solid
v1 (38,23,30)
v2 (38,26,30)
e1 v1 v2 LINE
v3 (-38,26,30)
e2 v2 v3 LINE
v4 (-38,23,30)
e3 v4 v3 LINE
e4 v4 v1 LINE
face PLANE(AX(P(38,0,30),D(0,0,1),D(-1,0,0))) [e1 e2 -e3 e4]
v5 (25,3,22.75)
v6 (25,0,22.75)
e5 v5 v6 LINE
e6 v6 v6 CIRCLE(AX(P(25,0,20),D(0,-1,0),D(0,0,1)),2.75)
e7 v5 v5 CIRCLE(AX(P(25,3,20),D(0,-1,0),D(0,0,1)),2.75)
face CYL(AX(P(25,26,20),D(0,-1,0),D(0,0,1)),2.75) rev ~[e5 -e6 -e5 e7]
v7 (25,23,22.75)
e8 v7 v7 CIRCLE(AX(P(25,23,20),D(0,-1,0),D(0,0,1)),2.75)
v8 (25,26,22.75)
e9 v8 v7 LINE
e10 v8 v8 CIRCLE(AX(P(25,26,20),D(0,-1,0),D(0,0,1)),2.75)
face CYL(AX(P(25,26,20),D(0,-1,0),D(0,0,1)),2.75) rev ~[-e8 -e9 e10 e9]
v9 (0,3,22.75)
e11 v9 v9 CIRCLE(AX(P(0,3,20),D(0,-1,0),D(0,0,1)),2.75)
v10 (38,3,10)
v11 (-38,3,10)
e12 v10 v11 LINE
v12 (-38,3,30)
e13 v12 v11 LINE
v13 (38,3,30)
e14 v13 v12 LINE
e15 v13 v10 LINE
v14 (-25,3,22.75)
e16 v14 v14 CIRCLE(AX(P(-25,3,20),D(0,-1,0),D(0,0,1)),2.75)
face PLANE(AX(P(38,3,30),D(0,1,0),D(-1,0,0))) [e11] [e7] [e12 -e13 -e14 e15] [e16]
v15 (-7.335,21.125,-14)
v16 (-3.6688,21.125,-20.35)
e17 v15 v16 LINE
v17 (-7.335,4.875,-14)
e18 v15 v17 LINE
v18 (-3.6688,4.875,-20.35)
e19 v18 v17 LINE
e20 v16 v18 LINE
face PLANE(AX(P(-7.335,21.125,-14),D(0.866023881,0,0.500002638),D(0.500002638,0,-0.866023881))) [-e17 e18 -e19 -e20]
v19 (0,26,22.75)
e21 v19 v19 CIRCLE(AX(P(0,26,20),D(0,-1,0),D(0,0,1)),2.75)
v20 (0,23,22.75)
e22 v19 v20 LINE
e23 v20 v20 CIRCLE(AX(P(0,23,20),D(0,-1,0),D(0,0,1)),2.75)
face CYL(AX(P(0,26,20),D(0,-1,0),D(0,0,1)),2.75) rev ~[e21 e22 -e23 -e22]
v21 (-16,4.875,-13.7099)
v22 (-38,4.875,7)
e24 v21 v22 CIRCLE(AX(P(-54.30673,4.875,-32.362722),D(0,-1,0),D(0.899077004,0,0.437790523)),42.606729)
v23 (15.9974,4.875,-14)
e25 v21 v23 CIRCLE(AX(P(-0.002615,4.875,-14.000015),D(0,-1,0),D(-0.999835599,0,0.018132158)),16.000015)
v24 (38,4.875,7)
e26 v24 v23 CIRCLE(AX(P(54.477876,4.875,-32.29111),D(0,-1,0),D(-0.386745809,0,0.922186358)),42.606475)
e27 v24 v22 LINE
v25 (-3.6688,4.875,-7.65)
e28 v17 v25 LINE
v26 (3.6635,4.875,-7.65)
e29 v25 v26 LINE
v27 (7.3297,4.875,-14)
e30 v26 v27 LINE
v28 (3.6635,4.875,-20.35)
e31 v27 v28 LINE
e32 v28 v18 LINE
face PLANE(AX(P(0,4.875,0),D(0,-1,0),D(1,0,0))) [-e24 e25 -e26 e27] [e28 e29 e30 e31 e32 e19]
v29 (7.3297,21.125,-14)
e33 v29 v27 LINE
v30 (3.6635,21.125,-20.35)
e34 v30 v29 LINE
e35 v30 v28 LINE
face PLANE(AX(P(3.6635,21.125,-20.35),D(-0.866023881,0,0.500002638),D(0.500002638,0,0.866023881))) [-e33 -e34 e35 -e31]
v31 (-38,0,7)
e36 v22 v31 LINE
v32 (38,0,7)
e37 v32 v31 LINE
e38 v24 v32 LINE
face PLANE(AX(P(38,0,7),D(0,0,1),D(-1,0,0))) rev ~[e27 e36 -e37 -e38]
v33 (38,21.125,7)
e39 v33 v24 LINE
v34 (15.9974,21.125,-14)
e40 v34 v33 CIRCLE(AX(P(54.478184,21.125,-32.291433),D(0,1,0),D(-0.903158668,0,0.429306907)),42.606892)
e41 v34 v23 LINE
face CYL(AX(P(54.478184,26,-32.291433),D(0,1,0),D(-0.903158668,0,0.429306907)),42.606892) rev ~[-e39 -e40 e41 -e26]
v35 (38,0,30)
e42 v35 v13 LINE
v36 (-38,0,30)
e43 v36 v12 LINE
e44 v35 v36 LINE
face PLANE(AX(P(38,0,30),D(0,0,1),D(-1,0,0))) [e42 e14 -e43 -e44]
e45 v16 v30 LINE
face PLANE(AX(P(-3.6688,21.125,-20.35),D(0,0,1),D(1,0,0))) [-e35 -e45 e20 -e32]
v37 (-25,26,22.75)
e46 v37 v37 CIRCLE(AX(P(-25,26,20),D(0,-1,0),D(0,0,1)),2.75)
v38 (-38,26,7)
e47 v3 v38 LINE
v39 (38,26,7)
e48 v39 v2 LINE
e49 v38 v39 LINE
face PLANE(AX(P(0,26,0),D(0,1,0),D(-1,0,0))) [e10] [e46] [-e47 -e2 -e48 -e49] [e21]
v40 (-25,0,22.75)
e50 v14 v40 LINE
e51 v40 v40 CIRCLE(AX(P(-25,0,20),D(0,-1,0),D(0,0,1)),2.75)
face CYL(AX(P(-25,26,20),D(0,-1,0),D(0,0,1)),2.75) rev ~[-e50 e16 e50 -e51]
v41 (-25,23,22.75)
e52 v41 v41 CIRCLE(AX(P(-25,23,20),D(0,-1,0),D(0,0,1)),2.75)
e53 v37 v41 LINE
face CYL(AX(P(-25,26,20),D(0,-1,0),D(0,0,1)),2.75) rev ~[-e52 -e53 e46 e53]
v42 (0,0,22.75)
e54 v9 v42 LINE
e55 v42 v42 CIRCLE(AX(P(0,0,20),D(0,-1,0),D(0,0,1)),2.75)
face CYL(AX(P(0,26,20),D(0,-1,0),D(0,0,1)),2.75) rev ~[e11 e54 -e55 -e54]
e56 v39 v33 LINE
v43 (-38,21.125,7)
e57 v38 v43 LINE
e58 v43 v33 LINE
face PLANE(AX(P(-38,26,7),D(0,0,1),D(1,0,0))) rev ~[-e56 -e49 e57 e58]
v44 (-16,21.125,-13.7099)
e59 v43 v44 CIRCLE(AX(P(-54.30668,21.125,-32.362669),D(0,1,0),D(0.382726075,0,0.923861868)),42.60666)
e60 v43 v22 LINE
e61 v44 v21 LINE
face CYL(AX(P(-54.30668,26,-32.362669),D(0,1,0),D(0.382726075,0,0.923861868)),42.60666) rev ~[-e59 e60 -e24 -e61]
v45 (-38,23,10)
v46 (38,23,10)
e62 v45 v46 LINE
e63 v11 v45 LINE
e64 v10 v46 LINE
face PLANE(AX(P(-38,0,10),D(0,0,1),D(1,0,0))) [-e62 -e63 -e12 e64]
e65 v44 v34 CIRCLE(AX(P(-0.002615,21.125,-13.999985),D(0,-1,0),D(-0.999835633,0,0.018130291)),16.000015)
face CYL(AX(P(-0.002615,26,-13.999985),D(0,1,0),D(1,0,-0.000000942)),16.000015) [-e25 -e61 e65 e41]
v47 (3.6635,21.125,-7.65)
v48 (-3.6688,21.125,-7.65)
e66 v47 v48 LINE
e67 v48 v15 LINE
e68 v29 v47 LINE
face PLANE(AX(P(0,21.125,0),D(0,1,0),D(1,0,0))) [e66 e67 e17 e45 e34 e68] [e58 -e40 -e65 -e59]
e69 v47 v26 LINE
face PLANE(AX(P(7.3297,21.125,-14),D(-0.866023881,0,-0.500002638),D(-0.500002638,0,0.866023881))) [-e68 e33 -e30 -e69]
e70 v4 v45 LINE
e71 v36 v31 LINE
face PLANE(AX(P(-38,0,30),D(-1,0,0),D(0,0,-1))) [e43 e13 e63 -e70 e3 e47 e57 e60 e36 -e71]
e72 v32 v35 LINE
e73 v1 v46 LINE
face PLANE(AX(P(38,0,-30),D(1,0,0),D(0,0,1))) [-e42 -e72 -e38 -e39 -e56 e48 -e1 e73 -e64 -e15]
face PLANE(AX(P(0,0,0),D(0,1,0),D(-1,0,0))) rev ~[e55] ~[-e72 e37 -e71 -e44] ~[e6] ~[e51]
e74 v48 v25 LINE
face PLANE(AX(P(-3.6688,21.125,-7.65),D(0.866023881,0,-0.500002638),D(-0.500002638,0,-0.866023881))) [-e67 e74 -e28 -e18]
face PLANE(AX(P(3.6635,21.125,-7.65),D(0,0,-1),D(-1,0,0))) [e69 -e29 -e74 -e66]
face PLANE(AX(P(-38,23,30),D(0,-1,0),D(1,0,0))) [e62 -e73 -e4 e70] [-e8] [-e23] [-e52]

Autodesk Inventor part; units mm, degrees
ref_plane "YZ Plane" through (0, 0, 0) normal (1, 0, 0) x (0, 1, 0)
ref_plane "XZ Plane" through (0, 0, 0) normal (0, 1, 0) x (-1, 0, 0)
ref_plane "XY Plane" through (0, 0, 0) normal (0, 0, 1) x (1, 0, 0)
sketch "Sketch1" plane through (0, 0, 0) normal (0, 1, 0) x (-1, 0, 0)
  line L0 (-38, 30) -> (38, 30)
  line L1 (38, 30) -> (38, -30)
  line L2 (38, -30) -> (-38, -30)
  line L3 (-38, -30) -> (-38, 30)
  line L4 (-38, 30) -> (38, -30) construction
  line L5 (38, 30) -> (-38, -30) construction
  point P0 (0, 0)
  dimension "d0" = 60
  dimension "d1" = 76
extrude "Extrusion1" add sketch "Sketch1" along normal blind 26
sketch "Sketch2" plane through (-38, 0, 30) normal (0, 0, 1) x (1, 0, 0)
  line L0 (0, 0) -> (0, 26) projected
  line L1 (76, 0) -> (76, 26) projected
  line L2 (0, 23) -> (76, 23)
  line L3 (76, 23) -> (76, 3)
  line L4 (76, 3) -> (0, 3)
  line L5 (0, 3) -> (0, 23)
  line L6 (0, 26) -> (76, 26) projected
  line L7 (0, 0) -> (76, 0) projected
  point P0 (38, 0)
  point P1 (0, 3)
  dimension "d4" = 3
  dimension "d5" = 3
extrude "Extrusion2" cut sketch "Sketch2" against normal blind 20 contours L0 L2 L1 L4
sketch "Sketch3" plane through (0, 26, 0) normal (0, 1, 0) x (1, 0, 0)
  arc A0 (15.9974, 14) -> (-16, 13.7099) centre (-0.0026, 14) ccw
  line L0 (38, 30) -> (-38, 30) projected
  line L1 (-38, 30) -> (-38, -30) projected
  arc A1 (-38, -7) -> (-16, 13.7099) centre (-54.3067, 32.3627) ccw
  line L2 (38, -30) -> (38, 30) projected
  line L3 (38, 30) -> (-38, 30) projected
  line L4 (38, -30) -> (-38, -30) projected
  arc A2 (15.9974, 14) -> (38, -7) centre (54.478, 32.2913) ccw
  line L5 (-38, -10) -> (-38, -30) projected
  line L6 (-38, -7) -> (38, -7)
  line L7 (38, -10) -> (-38, -10) projected
  point P0 (0, 0)
  point P1 (38, -7)
  point P2 (-0.0026, 30)
  dimension "d8" = 32
  dimension "d10" = 3
extrude "Extrusion3" cut sketch "Sketch3" against normal through all contours A0 L0 L2 A2 | A0 A1 L1 L0
sketch "Sketch5" plane through (0, 26, 0) normal (0, 1, 0) x (1, 0, 0)
  arc A0 (15.9974, 14) -> (-16, 13.7099) centre (-0.0026, 14) ccw
  line L0 (38, 30) -> (-38, 30)
  line L1 (-38, 30) -> (-38, -30)
  arc A1 (-38, -7) -> (-16, 13.7099) centre (-54.3067, 32.3627) ccw
  line L2 (38, -30) -> (38, 30)
  line L3 (38, 30) -> (-38, 30)
  line L4 (38, -30) -> (-38, -30)
  arc A2 (15.9974, 14) -> (38, -7) centre (54.478, 32.2913) ccw
  line L5 (-38, -10) -> (-38, -30)
  line L6 (-38, -7) -> (38, -7)
  line L7 (38, -10) -> (-38, -10)
  point P0 (0, 0)
  point P1 (0, 0)
  point P2 (38, -7)
  point P3 (-0.0026, 30)
  dimension "d13" = 32
  dimension "d14" = 3
sketch "Sketch7" plane through (0, 0, 0) normal (0, -1, 0) x (1, 0, 0)
  arc A0 (-16, -13.7099) -> (15.9974, -14) centre (-0.0026, -14) ccw projected
  arc A1 (-16, -13.7099) -> (15.9974, -14) centre (-0.0026, -14) ccw
  line L0 (38, 30) -> (38, 7) projected
  arc A2 (38, 7) -> (15.9974, -14) centre (54.478, -32.2913) ccw
  arc A3 (-16, -13.7099) -> (-38, 7) centre (-54.3067, -32.3627) ccw projected
  arc A4 (-16, -13.7099) -> (-38, 7) centre (-54.3067, -32.3627) ccw
  line L1 (-38, 10) -> (38, 10) projected
  line L2 (38, 10) -> (-38, 10)
  line L3 (38, 7) -> (38, 10)
  line L4 (-38, 7) -> (-38, 30) projected
  line L5 (-38, 7) -> (-38, 10)
  arc A5 (38, 7) -> (15.9974, -14) centre (54.478, -32.2913) ccw projected
  line L6 (38, 7) -> (-38, 7)
  point P0 (0, 0)
extrude "Extrusion4" cut sketch "Sketch5" against normal blind 4.875 contours A2 L6 A1 A0
extrude "Extrusion5" cut sketch "Sketch7" against normal blind 4.875 contours A3 L6 A2 A0
sketch "Sketch9" plane through (0, 21.125, 0) normal (0, 1, 0) x (1, 0, 0)
  arc A0 (15.9974, 14) -> (-16, 13.7099) centre (-0.0026, 14) ccw projected
  line L0 (3.6635, 20.35) -> (7.3297, 14)
  line L1 (7.3297, 14) -> (3.6635, 7.65)
  line L2 (3.6635, 7.65) -> (-3.6688, 7.65)
  line L3 (-3.6688, 7.65) -> (-7.335, 14)
  line L4 (-7.335, 14) -> (-3.6688, 20.35)
  line L5 (-3.6688, 20.35) -> (3.6635, 20.35)
  point P0 (0, 0)
  dimension "d19" = 12.7
extrude "Extrusion6" cut sketch "Sketch9" against normal through all
sketch "Sketch10" plane through (0, 26, 0) normal (0, 1, 0) x (1, 0, 0)
  circle A0 centre (0, -20) radius 5.8489
  circle A1 centre (25, -20) radius 5.871
  circle A2 centre (-25, -20) radius 5.8765
  line L0 (-38, -7) -> (-38, -30) projected
  line L1 (-38, -30) -> (38, -30) projected
  point P0 (0, 0)
  dimension "d23" = 10
  dimension "d24" = 10
  dimension "d25" = 10
  dimension "d27" = 0
  dimension "d28" = 25
  dimension "d29" = 25
hole "Hole1" at (-25, 26, 20) at (0, 26, 20) at (25, 26, 20) direction (0, -1, 0) diameter 5.5 end through all clearance for "Flat Head Machine Screw" size "M5" standard "Ansi Metric M Profile"
properties part number "CH-1-02-BearingBracket"
